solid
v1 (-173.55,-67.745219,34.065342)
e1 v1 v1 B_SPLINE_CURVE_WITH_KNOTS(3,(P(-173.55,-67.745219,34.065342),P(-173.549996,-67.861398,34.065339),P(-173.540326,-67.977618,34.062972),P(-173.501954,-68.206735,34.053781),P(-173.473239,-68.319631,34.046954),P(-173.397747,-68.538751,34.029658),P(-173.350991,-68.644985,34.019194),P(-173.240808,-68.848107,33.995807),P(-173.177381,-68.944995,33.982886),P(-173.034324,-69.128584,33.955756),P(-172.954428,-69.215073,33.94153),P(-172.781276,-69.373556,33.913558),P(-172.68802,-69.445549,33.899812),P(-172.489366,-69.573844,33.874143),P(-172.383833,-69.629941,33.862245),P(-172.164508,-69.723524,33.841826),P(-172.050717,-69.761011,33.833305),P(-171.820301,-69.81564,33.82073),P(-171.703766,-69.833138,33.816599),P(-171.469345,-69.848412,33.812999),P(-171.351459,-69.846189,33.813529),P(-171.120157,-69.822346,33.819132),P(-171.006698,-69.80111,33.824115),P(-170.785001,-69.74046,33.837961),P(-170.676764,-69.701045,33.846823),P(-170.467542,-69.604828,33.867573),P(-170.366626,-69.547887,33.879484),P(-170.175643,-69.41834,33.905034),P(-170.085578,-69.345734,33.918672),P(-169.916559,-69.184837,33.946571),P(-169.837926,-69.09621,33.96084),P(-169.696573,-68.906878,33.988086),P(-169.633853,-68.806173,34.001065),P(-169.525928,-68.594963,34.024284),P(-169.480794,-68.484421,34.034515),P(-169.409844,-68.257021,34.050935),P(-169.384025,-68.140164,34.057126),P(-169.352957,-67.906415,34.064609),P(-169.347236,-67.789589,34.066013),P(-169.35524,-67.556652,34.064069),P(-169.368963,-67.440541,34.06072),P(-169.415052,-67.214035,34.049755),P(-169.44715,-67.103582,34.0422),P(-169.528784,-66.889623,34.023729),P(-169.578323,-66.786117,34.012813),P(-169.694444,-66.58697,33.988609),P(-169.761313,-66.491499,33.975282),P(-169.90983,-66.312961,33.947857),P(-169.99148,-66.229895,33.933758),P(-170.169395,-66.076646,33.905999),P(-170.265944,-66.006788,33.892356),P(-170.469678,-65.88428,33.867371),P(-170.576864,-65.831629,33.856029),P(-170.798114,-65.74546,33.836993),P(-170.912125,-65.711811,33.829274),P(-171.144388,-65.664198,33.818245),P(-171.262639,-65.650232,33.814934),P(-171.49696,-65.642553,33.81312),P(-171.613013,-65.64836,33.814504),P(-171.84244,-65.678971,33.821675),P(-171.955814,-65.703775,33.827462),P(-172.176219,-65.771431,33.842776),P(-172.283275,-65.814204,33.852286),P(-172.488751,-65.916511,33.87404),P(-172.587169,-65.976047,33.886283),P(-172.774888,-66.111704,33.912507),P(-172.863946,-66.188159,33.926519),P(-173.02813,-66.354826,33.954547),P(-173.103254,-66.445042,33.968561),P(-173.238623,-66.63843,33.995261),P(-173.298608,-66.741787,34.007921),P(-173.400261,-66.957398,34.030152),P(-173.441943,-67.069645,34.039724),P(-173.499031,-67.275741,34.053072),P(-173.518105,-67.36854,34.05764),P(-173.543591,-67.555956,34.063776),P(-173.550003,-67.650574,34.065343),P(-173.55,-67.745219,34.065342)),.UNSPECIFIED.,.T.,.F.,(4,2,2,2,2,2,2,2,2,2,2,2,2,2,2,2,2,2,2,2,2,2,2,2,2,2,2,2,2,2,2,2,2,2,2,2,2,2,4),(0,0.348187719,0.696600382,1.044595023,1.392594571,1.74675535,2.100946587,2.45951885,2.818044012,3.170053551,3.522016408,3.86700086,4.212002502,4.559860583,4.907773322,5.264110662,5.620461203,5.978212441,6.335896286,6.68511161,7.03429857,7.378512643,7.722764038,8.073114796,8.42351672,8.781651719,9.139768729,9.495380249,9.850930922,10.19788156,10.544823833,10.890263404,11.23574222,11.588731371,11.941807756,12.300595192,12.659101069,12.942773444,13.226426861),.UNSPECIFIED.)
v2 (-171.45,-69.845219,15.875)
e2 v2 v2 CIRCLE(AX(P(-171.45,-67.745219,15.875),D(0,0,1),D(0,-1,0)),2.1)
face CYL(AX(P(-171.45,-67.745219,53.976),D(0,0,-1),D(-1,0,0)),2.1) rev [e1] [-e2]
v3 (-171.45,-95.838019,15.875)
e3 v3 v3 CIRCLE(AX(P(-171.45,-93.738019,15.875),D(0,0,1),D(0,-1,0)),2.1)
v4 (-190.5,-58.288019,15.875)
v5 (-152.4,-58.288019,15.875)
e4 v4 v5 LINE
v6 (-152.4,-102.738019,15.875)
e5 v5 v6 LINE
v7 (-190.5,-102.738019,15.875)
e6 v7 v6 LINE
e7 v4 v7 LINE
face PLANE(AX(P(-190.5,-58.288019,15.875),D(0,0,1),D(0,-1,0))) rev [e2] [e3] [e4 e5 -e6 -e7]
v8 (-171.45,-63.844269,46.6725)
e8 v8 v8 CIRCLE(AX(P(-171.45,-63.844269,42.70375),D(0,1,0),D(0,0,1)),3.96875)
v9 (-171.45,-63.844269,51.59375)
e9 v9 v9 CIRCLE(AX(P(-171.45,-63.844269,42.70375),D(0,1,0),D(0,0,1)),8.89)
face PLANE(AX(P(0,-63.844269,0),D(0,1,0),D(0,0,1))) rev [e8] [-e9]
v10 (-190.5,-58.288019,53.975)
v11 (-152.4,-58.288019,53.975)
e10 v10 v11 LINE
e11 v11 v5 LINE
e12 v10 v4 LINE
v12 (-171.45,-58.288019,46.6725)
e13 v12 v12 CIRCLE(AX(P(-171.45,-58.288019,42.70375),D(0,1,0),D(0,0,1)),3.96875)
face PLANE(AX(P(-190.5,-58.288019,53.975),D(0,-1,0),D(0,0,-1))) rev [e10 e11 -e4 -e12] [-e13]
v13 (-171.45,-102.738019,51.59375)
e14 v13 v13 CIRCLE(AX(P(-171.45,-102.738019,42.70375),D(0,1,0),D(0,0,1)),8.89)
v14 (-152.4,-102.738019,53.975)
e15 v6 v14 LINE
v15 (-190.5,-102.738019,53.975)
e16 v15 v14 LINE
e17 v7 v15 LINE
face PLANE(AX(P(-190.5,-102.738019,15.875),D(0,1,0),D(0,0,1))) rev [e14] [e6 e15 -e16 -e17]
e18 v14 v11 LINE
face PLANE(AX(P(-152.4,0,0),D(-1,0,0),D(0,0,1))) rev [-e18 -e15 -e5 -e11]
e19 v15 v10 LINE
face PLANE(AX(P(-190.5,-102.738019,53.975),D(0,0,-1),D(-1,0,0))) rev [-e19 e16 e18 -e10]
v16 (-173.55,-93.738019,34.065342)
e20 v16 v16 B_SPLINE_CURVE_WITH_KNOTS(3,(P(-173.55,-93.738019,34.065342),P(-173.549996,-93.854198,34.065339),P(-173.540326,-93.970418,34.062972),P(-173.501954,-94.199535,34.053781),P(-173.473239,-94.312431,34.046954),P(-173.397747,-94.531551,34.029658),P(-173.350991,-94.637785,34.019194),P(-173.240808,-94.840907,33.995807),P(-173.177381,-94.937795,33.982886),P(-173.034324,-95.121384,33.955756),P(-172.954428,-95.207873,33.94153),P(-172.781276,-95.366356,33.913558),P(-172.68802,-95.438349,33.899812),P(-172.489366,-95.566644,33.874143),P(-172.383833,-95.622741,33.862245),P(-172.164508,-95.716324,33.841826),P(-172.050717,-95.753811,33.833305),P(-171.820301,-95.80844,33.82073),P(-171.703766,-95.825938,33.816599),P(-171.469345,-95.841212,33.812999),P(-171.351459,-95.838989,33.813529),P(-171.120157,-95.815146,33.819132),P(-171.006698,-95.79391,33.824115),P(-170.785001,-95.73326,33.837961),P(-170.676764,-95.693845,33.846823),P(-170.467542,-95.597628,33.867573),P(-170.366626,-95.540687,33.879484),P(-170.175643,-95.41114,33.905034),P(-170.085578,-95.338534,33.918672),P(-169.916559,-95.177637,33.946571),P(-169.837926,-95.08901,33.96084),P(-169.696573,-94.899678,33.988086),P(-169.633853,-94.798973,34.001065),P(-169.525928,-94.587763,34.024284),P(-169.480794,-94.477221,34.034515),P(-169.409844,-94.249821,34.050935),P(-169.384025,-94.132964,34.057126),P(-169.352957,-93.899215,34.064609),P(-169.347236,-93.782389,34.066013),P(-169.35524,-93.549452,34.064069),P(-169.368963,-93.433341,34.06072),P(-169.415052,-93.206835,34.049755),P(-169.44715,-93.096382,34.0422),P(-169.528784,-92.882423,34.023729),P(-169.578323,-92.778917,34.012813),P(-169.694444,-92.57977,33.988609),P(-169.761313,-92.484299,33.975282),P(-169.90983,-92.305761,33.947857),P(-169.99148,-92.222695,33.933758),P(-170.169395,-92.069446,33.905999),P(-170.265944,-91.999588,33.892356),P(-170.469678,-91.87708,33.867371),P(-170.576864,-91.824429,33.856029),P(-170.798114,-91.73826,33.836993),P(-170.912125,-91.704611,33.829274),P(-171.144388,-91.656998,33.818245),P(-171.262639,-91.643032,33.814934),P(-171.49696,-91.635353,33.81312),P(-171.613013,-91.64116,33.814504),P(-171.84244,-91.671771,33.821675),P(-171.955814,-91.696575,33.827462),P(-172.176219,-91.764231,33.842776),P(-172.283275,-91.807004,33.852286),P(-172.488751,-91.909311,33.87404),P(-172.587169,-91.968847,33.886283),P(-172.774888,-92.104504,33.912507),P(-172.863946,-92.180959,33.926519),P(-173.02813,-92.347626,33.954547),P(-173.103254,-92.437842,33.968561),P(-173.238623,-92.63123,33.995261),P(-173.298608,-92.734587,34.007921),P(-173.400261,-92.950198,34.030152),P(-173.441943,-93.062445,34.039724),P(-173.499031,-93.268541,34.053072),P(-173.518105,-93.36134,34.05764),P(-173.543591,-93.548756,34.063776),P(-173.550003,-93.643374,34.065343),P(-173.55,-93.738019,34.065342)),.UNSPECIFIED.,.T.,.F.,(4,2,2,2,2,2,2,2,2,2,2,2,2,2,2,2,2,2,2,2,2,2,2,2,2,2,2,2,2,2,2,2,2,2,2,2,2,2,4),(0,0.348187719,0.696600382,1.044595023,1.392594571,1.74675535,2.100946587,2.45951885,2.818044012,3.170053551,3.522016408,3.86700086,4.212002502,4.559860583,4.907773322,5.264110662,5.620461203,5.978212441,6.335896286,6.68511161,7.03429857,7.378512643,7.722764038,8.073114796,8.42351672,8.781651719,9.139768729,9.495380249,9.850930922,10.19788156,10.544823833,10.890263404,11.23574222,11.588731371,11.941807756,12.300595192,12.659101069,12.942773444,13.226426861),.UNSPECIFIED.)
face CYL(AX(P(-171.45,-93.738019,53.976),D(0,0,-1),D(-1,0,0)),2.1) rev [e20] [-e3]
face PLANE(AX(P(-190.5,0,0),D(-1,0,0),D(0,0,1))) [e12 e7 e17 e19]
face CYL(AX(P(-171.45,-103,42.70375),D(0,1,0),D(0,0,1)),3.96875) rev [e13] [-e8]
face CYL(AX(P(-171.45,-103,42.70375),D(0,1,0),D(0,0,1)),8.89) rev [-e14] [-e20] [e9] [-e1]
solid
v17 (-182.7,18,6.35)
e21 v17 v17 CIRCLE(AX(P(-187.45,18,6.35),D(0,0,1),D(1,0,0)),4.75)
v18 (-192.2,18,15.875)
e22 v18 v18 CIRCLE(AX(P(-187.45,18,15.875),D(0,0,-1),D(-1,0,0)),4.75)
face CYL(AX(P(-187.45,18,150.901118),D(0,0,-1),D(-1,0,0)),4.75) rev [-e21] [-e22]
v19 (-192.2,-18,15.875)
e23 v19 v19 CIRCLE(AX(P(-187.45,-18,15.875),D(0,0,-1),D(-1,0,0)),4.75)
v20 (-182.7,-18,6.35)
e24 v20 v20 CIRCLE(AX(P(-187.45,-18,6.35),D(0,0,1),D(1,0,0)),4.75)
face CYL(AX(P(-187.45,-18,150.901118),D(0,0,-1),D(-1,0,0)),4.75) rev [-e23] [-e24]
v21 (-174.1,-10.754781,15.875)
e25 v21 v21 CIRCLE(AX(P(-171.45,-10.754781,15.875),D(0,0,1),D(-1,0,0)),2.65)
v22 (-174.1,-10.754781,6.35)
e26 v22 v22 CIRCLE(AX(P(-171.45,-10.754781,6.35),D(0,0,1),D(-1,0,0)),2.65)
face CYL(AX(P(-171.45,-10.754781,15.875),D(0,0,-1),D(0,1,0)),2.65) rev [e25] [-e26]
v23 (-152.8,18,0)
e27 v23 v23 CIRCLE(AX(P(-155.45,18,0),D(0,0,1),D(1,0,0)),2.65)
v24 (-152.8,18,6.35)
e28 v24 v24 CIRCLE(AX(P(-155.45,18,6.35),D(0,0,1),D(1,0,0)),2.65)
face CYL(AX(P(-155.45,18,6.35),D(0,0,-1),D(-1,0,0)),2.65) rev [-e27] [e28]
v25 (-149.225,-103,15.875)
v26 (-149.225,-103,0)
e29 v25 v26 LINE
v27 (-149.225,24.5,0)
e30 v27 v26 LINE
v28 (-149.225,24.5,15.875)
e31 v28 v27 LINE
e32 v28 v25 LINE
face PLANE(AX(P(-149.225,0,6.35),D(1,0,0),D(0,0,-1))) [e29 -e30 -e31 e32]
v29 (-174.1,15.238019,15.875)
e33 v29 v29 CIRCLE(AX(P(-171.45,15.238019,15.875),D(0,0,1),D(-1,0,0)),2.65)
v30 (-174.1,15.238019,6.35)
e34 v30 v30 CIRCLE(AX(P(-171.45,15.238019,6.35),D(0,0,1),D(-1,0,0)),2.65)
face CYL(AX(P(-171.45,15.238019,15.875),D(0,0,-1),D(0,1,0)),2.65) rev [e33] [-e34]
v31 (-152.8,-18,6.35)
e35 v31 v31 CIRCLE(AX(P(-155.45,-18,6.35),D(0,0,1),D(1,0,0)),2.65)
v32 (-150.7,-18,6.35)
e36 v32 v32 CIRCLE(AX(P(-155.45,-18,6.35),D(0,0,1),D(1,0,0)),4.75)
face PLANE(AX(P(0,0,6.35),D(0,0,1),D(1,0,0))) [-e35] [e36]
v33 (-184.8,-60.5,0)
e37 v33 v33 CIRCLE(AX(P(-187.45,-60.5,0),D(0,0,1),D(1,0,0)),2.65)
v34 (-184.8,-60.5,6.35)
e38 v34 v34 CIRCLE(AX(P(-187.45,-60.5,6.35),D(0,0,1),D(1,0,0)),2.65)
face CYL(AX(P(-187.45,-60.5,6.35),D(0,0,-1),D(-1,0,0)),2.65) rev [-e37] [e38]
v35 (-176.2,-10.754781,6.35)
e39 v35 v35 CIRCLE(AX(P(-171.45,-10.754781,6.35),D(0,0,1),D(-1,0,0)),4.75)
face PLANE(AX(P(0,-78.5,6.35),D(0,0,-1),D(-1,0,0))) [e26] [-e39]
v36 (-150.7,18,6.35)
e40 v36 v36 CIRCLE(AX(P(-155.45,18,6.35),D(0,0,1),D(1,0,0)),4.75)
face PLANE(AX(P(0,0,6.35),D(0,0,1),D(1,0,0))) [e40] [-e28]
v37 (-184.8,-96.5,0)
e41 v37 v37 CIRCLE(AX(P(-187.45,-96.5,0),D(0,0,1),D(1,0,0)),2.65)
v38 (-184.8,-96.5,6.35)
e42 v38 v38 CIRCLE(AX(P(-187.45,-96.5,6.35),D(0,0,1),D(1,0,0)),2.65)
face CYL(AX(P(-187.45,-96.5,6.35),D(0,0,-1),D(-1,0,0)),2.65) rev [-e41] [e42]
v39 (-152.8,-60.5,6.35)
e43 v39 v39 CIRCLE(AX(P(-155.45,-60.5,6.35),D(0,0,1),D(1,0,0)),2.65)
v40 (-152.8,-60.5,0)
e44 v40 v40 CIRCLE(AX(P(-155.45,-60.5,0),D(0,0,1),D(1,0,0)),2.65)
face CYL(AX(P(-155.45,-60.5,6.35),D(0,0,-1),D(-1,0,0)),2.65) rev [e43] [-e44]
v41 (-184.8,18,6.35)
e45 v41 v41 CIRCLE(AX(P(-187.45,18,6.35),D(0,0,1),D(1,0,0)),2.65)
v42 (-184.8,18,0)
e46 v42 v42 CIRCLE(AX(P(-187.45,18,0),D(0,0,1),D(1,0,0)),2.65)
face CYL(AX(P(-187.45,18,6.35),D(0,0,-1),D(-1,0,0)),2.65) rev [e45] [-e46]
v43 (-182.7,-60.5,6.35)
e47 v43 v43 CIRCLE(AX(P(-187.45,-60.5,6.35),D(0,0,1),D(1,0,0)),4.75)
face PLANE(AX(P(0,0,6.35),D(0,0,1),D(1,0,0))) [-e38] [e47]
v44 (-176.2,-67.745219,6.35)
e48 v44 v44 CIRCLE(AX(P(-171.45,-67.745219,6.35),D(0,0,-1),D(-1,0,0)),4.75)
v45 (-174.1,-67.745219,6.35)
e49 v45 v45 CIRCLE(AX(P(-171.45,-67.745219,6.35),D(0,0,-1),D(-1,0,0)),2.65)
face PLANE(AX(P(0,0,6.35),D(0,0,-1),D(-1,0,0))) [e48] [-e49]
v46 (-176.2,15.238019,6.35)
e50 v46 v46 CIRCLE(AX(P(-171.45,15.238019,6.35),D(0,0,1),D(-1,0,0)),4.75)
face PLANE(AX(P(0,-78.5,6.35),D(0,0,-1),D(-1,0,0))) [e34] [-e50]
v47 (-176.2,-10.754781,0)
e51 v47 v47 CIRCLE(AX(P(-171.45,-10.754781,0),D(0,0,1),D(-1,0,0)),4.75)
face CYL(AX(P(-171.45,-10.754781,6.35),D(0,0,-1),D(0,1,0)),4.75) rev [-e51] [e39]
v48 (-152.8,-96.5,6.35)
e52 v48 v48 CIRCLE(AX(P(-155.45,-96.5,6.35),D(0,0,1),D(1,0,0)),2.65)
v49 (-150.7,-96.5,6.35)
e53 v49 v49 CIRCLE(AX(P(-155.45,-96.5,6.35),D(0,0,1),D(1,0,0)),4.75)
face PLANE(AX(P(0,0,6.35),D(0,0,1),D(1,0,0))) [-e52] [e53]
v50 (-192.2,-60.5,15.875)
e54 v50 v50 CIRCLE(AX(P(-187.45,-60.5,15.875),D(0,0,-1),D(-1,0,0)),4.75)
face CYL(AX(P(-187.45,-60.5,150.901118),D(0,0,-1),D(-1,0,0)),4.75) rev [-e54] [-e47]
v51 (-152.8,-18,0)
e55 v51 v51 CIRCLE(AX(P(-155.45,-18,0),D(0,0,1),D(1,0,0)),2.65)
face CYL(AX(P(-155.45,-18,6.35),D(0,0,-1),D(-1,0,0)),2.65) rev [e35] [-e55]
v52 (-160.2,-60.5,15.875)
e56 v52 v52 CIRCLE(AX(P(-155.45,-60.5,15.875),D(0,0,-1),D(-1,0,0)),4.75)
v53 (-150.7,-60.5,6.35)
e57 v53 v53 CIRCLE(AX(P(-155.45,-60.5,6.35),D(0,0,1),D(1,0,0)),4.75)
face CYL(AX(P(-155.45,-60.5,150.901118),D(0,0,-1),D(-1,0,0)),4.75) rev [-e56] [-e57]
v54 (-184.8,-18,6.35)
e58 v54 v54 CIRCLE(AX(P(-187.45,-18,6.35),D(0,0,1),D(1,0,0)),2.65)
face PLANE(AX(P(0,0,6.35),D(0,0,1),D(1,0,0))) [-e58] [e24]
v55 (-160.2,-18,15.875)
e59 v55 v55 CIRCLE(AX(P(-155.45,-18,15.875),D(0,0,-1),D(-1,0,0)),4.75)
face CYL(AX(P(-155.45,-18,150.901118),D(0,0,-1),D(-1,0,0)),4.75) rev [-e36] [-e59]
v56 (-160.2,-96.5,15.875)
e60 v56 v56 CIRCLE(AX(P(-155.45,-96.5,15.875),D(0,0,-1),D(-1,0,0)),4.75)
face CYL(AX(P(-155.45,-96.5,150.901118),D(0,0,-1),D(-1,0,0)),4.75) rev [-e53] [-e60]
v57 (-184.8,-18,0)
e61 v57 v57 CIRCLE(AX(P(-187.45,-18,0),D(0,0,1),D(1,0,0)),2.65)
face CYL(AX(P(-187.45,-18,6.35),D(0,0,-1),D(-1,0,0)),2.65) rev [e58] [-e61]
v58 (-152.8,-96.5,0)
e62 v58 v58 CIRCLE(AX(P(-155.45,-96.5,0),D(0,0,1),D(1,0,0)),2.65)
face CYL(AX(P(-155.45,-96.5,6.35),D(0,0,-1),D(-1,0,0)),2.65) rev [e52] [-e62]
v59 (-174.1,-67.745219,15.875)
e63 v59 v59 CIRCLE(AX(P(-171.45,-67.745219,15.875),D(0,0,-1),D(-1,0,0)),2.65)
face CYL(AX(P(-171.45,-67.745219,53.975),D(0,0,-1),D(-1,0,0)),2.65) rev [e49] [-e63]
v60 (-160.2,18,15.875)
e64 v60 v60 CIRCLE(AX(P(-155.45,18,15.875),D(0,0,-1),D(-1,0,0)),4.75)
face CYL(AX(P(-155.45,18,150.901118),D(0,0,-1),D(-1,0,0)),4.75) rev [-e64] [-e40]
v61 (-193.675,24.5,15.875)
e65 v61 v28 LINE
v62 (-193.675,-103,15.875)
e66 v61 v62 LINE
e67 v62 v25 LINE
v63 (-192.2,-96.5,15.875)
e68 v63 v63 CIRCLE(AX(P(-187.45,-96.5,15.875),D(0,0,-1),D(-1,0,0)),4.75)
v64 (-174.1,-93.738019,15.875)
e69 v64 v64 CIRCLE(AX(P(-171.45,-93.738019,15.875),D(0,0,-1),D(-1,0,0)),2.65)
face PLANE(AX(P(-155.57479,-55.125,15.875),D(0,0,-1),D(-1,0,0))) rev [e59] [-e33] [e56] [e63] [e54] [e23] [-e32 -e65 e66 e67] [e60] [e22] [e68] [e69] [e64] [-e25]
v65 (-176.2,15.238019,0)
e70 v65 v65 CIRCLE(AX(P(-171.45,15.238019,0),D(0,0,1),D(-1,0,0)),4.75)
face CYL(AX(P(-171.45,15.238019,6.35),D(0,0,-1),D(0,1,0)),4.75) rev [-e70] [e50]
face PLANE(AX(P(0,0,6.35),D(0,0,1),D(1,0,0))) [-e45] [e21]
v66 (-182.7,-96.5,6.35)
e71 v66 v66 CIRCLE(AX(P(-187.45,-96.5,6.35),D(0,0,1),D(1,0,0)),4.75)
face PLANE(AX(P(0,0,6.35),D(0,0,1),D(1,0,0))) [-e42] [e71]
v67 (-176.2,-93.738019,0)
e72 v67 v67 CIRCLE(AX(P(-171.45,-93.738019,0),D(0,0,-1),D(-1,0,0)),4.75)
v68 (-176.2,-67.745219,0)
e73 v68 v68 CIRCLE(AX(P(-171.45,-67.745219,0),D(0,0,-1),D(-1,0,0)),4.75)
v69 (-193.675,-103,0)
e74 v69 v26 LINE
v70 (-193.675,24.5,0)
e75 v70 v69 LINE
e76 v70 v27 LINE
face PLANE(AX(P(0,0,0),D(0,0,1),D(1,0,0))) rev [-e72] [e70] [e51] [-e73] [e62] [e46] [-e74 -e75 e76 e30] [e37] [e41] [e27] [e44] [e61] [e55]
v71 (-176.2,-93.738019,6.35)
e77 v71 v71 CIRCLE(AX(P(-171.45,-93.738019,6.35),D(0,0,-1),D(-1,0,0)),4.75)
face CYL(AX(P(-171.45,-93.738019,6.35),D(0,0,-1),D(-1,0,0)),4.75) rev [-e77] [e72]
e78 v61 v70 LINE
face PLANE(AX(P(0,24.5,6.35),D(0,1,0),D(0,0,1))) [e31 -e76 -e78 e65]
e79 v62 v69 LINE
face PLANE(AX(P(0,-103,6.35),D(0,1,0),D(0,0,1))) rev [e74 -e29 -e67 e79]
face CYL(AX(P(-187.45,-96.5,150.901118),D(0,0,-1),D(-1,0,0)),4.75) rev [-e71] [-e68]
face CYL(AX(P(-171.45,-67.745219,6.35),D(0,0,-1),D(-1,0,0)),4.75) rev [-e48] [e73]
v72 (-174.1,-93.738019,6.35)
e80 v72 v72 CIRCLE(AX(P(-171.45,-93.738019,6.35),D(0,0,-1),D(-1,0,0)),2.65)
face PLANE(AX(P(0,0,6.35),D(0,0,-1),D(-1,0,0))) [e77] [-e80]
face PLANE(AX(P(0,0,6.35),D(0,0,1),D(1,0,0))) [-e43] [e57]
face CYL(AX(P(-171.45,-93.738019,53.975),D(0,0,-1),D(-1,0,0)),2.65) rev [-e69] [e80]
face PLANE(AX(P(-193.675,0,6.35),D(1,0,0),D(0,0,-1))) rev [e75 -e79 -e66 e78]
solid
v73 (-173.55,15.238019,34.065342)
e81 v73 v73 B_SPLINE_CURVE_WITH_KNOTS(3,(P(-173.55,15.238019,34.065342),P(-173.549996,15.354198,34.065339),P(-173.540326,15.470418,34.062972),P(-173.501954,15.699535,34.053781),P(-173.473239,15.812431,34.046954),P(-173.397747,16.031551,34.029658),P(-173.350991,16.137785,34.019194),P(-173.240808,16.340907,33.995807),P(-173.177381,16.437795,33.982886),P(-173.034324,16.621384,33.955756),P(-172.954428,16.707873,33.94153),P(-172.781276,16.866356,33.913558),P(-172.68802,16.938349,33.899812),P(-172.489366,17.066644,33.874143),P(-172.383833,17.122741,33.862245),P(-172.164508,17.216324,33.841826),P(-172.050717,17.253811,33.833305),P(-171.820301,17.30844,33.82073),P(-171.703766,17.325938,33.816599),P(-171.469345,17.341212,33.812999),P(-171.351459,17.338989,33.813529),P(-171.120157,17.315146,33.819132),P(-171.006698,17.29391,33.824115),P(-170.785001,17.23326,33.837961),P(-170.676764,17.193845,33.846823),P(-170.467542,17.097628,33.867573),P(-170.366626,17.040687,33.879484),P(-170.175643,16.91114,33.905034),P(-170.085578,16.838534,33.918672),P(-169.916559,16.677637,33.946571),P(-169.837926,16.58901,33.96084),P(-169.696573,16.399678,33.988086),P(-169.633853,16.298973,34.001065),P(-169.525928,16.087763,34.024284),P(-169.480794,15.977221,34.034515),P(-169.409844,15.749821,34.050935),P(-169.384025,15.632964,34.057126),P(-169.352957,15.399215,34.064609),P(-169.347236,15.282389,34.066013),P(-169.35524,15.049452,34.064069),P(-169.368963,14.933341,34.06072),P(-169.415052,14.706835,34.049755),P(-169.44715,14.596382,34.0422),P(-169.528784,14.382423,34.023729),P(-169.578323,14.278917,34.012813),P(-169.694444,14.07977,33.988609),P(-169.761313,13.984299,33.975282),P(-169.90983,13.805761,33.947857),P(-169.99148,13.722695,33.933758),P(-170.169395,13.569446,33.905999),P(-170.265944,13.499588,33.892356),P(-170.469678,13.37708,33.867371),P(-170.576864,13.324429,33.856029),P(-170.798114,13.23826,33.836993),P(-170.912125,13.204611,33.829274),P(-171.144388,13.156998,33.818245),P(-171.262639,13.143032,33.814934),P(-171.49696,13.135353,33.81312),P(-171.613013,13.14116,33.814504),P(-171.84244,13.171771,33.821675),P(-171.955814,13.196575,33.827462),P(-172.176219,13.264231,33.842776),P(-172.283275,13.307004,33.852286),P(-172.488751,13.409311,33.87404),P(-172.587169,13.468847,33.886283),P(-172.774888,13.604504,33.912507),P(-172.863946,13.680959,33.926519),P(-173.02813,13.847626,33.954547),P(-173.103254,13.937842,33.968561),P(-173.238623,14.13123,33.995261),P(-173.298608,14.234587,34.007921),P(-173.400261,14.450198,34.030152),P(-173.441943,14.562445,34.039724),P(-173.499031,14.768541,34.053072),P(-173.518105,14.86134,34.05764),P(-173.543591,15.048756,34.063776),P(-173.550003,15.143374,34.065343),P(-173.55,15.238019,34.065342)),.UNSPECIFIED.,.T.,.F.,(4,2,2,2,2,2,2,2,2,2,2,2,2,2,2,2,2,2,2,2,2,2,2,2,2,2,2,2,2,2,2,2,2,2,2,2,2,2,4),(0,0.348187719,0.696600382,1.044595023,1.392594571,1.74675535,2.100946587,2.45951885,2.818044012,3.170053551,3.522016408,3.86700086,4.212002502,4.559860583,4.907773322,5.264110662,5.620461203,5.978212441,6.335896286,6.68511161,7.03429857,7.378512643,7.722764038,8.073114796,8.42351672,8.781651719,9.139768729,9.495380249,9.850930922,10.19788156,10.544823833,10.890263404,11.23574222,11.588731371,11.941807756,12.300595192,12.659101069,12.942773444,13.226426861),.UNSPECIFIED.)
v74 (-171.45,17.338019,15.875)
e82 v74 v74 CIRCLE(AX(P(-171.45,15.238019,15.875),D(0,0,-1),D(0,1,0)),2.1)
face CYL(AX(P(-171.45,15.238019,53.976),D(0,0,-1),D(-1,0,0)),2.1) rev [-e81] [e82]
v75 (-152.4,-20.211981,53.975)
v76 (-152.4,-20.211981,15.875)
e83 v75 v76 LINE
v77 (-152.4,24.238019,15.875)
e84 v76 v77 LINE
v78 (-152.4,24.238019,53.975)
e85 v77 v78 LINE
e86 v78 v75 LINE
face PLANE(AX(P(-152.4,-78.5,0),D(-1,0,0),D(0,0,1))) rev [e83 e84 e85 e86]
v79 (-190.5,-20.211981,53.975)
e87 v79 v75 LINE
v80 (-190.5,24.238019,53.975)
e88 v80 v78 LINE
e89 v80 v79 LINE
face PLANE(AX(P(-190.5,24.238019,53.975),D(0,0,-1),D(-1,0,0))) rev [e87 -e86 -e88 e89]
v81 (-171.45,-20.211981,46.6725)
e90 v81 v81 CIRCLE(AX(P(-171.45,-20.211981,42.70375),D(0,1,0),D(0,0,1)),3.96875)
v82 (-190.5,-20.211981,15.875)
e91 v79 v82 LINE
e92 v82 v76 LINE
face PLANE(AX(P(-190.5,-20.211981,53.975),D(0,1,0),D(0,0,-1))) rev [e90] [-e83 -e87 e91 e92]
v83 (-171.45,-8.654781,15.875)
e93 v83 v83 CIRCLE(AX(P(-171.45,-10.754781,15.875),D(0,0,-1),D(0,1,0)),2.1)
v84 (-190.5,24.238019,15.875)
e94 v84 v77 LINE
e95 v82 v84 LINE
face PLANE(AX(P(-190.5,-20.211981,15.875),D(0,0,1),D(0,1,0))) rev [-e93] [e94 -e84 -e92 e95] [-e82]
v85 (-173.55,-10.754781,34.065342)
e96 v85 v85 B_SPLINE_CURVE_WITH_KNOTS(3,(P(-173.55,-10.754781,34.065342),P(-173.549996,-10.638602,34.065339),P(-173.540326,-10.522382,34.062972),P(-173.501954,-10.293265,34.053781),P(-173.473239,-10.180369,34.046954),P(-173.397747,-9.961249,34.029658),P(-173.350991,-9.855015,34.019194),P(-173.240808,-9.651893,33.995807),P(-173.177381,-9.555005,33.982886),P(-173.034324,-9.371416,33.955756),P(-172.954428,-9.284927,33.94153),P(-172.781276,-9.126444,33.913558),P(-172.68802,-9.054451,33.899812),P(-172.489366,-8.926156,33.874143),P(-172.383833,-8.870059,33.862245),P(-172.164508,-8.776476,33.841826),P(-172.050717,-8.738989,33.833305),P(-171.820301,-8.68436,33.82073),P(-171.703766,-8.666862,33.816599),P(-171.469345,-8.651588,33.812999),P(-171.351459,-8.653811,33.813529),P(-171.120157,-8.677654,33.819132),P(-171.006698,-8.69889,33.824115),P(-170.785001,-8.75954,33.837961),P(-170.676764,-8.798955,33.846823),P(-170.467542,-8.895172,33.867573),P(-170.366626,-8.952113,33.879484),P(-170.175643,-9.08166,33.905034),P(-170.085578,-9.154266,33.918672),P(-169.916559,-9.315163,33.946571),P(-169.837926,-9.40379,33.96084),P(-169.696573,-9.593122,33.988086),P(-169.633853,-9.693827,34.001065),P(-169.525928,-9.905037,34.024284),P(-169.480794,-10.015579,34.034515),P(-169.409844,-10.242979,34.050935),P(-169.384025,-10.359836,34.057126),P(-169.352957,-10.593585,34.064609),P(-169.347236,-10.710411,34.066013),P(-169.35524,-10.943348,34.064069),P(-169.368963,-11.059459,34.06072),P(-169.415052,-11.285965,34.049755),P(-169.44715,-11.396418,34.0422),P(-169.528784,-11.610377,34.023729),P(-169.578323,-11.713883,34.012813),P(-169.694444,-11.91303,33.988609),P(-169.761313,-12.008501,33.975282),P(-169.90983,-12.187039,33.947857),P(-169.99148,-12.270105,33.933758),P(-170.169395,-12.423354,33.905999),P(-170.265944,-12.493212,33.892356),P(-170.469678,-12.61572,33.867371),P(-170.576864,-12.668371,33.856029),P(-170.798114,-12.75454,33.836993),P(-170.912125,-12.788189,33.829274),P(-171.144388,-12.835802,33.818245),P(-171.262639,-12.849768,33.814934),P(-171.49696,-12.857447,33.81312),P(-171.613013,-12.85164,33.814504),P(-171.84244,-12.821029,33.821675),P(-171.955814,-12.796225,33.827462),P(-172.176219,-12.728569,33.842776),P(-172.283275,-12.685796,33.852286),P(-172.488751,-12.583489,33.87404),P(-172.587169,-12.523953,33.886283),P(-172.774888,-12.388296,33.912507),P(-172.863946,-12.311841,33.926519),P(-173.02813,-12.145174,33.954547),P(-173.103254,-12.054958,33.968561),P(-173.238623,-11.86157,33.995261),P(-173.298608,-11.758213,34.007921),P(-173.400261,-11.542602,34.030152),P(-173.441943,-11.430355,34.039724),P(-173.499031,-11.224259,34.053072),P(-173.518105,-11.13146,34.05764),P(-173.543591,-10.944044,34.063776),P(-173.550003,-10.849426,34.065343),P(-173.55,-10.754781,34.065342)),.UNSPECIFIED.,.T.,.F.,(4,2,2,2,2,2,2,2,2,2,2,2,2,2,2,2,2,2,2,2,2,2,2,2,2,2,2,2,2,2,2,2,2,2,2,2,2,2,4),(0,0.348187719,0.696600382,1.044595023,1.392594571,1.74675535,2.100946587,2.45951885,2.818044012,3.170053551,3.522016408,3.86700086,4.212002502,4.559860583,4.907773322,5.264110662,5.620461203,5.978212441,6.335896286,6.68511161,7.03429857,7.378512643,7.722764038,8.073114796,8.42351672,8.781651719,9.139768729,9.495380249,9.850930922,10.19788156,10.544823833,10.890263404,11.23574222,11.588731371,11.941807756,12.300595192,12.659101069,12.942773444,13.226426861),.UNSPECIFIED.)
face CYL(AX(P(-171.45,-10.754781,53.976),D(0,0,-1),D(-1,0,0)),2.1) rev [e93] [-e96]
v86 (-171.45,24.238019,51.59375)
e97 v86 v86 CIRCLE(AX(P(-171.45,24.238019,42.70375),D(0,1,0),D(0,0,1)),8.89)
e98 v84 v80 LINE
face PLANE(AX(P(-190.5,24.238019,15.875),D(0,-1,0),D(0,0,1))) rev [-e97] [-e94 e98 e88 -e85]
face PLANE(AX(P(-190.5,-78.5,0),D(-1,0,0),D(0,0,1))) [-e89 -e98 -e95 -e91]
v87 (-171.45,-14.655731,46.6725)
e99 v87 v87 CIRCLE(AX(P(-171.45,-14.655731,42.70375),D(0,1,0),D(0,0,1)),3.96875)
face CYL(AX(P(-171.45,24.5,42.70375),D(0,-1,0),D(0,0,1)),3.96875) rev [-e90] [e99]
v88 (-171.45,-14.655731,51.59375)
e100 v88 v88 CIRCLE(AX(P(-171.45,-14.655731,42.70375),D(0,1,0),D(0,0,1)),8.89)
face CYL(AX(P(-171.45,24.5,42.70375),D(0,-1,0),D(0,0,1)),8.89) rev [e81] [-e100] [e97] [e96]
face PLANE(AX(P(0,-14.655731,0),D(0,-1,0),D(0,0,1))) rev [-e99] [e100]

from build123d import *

# Parameters (mm, degrees)
SKETCH1_W               = 44.45
SKETCH1_H               = 127.5
SKETCH1_R               = 2.65
BOSS_EXTRUDE1_DEPTH     = 6.35
BOSS_EXTRUDE2_START     = 6.35
SKETCH1_3_W             = 44.45
SKETCH1_3_H             = 127.5
SKETCH1_3_R             = 4.75
BOSS_EXTRUDE2_DEPTH     = 9.525
SKETCH3_W               = 38.1
SKETCH3_H               = 44.45
BOSS_EXTRUDE3_DEPTH     = 19.05
SKETCH4_R               = 3.96875
CUT_EXTRUDE1_DEPTH      = 218.433121666
CUT_EXTRUDE2_START      = -5.55625
SKETCH4_3_R             = 8.89
CUT_EXTRUDE2_DEPTH      = 212.876871666
CUT_EXTRUDE3_REACH      = 227.903
CUT_EXTRUDE3_END_RADIUS = 8.89
SKETCH5_R               = 2.1
SKETCH5_3_R             = 2.65
SKETCH5_3_R_2           = 2.1
CUT_EXTRUDE4_DEPTH      = 226.903311729
SKETCH5_4_R             = 4.75
SKETCH5_4_R_2           = 2.65
CUT_EXTRUDE5_DEPTH      = 6.35
MIRROR2_OUTLINE_R       = 4.75
MIRROR2_DEPTH           = 6.35
MIRROR2_START           = 6.35
MIRROR2_2_OUTLINE_R     = 2.65
MIRROR2_2_DEPTH         = 9.525


# Read off the part's stored shape, not the designer's step: Mirror2
with BuildPart() as part:
    # Sketch1 → Boss-Extrude1 (new body)
    with BuildSketch(Plane.XY):
        with Locations((-171.45, -39.25)):
            Rectangle(SKETCH1_W, SKETCH1_H)
        with Locations((-155.45, -96.5)):
            Circle(SKETCH1_R, mode=Mode.SUBTRACT)
        with Locations((-187.45, -96.5)):
            Circle(SKETCH1_R, mode=Mode.SUBTRACT)
        with Locations((-187.45, -60.5)):
            Circle(SKETCH1_R, mode=Mode.SUBTRACT)
        with Locations((-155.45, -60.5)):
            Circle(SKETCH1_R, mode=Mode.SUBTRACT)
        with Locations((-155.45, -18)):
            Circle(SKETCH1_R, mode=Mode.SUBTRACT)
        with Locations((-187.45, -18)):
            Circle(SKETCH1_R, mode=Mode.SUBTRACT)
        with Locations((-187.45, 18)):
            Circle(SKETCH1_R, mode=Mode.SUBTRACT)
        with Locations((-155.45, 18)):
            Circle(SKETCH1_R, mode=Mode.SUBTRACT)
    extrude(amount=BOSS_EXTRUDE1_DEPTH)

    # Sketch1<3> → Boss-Extrude2 (add)
    with BuildSketch(Plane.XY.offset(BOSS_EXTRUDE2_START)):
        with Locations((-171.45, -39.25)):
            Rectangle(SKETCH1_3_W, SKETCH1_3_H)
        with Locations(Location((-187.45, -96.5, 0), (0, 0, 180))):
            Circle(SKETCH1_3_R, mode=Mode.SUBTRACT)
        with Locations(Location((-155.45, -96.5, 0), (0, 0, 180))):
            Circle(SKETCH1_3_R, mode=Mode.SUBTRACT)
        with Locations(Location((-187.45, -60.5, 0), (0, 0, 180))):
            Circle(SKETCH1_3_R, mode=Mode.SUBTRACT)
        with Locations(Location((-155.45, -60.5, 0), (0, 0, 180))):
            Circle(SKETCH1_3_R, mode=Mode.SUBTRACT)
        with Locations(Location((-155.45, -18, 0), (0, 0, 180))):
            Circle(SKETCH1_3_R, mode=Mode.SUBTRACT)
        with Locations(Location((-187.45, -18, 0), (0, 0, 180))):
            Circle(SKETCH1_3_R, mode=Mode.SUBTRACT)
        with Locations(Location((-187.45, 18, 0), (0, 0, 180))):
            Circle(SKETCH1_3_R, mode=Mode.SUBTRACT)
        with Locations(Location((-155.45, 18, 0), (0, 0, 180))):
            Circle(SKETCH1_3_R, mode=Mode.SUBTRACT)
    extrude(amount=BOSS_EXTRUDE2_DEPTH)


with BuildPart() as body_2:
    # Sketch3 → Boss-Extrude3 (new, symmetric)
    with BuildSketch(Plane.ZY.offset(171.45)):
        with Locations((34.925, -80.513019347)):
            Rectangle(SKETCH3_W, SKETCH3_H)
    extrude(amount=BOSS_EXTRUDE3_DEPTH, both=True)

    # Sketch4 → Cut-Extrude1 (cut, through all)
    with BuildSketch(Plane(origin=(0, -58.288019347, 0), x_dir=(-1, 0, 0), z_dir=(0, 1, 0))):
        with Locations(Location((171.45, 42.70375, 0), (0, 0, 90))):
            Circle(SKETCH4_R)
    extrude(amount=-CUT_EXTRUDE1_DEPTH, mode=Mode.SUBTRACT)

    # Sketch4<3> → Cut-Extrude2 (cut, through all)
    with BuildSketch(Plane(origin=(0, -58.288019347, 0), x_dir=(-1, 0, 0), z_dir=(0, 1, 0)).offset(CUT_EXTRUDE2_START)):
        with Locations(Location((171.45, 42.70375, 0), (0, 0, 90))):
            Circle(SKETCH4_3_R)
    extrude(amount=-CUT_EXTRUDE2_DEPTH, mode=Mode.SUBTRACT)


with BuildPart() as cut_extrude3_tool:
    # Cut-Extrude3: up to this cylinder (the profile starts outside it)
    cut_extrude3_end = Plane(origin=(-171.45, -80.741619, 42.70375), z_dir=(0, 1, 0)) * Cylinder(CUT_EXTRUDE3_END_RADIUS, 500.5788, mode=Mode.PRIVATE)
    # Sketch5 → Cut-Extrude3 (new, up to the surface)
    with BuildSketch(Plane(origin=(0, 0, 0), x_dir=(1, 0, 0), z_dir=(0, 0, -1)), mode=Mode.PRIVATE) as cut_extrude3_sk1:
        with Locations(Location((-171.45, 67.745219347, 0), (0, 0, 180))):
            Circle(SKETCH5_R)
    cut_extrude3_tool1 = extrude(cut_extrude3_sk1.sketch, amount=-CUT_EXTRUDE3_REACH, mode=Mode.PRIVATE) - cut_extrude3_end
    add(cut_extrude3_tool1.solids().sort_by_distance((-171.45, -67.745219, 0))[0])
    # Sketch5 → Cut-Extrude3 (new, up to the surface)
    with BuildSketch(Plane(origin=(0, 0, 0), x_dir=(1, 0, 0), z_dir=(0, 0, -1)), mode=Mode.PRIVATE) as cut_extrude3_sk2:
        with Locations(Location((-171.45, 93.738019347, 0), (0, 0, 180))):
            Circle(SKETCH5_R)
    cut_extrude3_tool2 = extrude(cut_extrude3_sk2.sketch, amount=-CUT_EXTRUDE3_REACH, mode=Mode.PRIVATE) - cut_extrude3_end
    add(cut_extrude3_tool2.solids().sort_by_distance((-171.45, -93.738019, 0))[0])


with BuildPart() as part_1:
    add(part.part)

    # Cut-Extrude3: cut by cut_extrude3_tool
    add(cut_extrude3_tool.part, mode=Mode.SUBTRACT)

    # Sketch5<3> → Cut-Extrude4 (cut, through all)
    # profile 1 of 2: a face of its own
    with BuildSketch(Plane(origin=(0, 0, 0), x_dir=(1, 0, 0), z_dir=(0, 0, -1))):
        with Locations(Location((-171.45, 67.745219347, 0), (0, 0, 180))):
            Circle(SKETCH5_3_R)
        with Locations(Location((-171.45, 67.745219347, 0), (0, 0, 180))):
            Circle(SKETCH5_3_R_2, mode=Mode.SUBTRACT)
    # profile 2 of 2: a face of its own
    with BuildSketch(Plane(origin=(0, 0, 0), x_dir=(1, 0, 0), z_dir=(0, 0, -1))):
        with Locations(Location((-171.45, 93.738019347, 0), (0, 0, 180))):
            Circle(SKETCH5_3_R)
        with Locations(Location((-171.45, 93.738019347, 0), (0, 0, 180))):
            Circle(SKETCH5_3_R_2, mode=Mode.SUBTRACT)
    extrude(amount=-CUT_EXTRUDE4_DEPTH, mode=Mode.SUBTRACT)

    # Sketch5<4> → Cut-Extrude5 (cut)
    # profile 1 of 2: a face of its own
    with BuildSketch(Plane(origin=(0, 0, 0), x_dir=(1, 0, 0), z_dir=(0, 0, -1))):
        with Locations(Location((-171.45, 67.745219347, 0), (0, 0, 180))):
            Circle(SKETCH5_4_R)
        with Locations(Location((-171.45, 67.745219347, 0), (0, 0, 180))):
            Circle(SKETCH5_4_R_2, mode=Mode.SUBTRACT)
    # profile 2 of 2: a face of its own
    with BuildSketch(Plane(origin=(0, 0, 0), x_dir=(1, 0, 0), z_dir=(0, 0, -1))):
        with Locations(Location((-171.45, 93.738019347, 0), (0, 0, 180))):
            Circle(SKETCH5_4_R)
        with Locations(Location((-171.45, 93.738019347, 0), (0, 0, 180))):
            Circle(SKETCH5_4_R_2, mode=Mode.SUBTRACT)
    extrude(amount=-CUT_EXTRUDE5_DEPTH, mode=Mode.SUBTRACT)

    # Mirror2 outline → Mirror2 (cut)
    with BuildSketch(Plane.XY):
        with Locations((-171.45, 15.238019347)):
            Circle(MIRROR2_OUTLINE_R)
        with Locations((-171.45, -10.754780653)):
            Circle(MIRROR2_OUTLINE_R)
    extrude(amount=MIRROR2_DEPTH, mode=Mode.SUBTRACT)

    # Mirror2 2 outline → Mirror2 2 (cut)
    with BuildSketch(Plane.XY.offset(MIRROR2_START)):
        with Locations((-171.45, 15.238019347)):
            Circle(MIRROR2_2_OUTLINE_R)
        with Locations((-171.45, -10.754780653)):
            Circle(MIRROR2_2_OUTLINE_R)
    extrude(amount=MIRROR2_2_DEPTH, mode=Mode.SUBTRACT)


with BuildPart() as body_2_1:
    add(body_2.part)

    # Cut-Extrude3: cut by cut_extrude3_tool
    add(cut_extrude3_tool.part, mode=Mode.SUBTRACT)


with BuildPart() as body_3:
    # Mirror1: mirrored copy
    add(body_2_1.part.mirror(Plane.ZX.offset(-39.25)))


solid = Compound([part_1.part, body_2_1.part, body_3.part])
